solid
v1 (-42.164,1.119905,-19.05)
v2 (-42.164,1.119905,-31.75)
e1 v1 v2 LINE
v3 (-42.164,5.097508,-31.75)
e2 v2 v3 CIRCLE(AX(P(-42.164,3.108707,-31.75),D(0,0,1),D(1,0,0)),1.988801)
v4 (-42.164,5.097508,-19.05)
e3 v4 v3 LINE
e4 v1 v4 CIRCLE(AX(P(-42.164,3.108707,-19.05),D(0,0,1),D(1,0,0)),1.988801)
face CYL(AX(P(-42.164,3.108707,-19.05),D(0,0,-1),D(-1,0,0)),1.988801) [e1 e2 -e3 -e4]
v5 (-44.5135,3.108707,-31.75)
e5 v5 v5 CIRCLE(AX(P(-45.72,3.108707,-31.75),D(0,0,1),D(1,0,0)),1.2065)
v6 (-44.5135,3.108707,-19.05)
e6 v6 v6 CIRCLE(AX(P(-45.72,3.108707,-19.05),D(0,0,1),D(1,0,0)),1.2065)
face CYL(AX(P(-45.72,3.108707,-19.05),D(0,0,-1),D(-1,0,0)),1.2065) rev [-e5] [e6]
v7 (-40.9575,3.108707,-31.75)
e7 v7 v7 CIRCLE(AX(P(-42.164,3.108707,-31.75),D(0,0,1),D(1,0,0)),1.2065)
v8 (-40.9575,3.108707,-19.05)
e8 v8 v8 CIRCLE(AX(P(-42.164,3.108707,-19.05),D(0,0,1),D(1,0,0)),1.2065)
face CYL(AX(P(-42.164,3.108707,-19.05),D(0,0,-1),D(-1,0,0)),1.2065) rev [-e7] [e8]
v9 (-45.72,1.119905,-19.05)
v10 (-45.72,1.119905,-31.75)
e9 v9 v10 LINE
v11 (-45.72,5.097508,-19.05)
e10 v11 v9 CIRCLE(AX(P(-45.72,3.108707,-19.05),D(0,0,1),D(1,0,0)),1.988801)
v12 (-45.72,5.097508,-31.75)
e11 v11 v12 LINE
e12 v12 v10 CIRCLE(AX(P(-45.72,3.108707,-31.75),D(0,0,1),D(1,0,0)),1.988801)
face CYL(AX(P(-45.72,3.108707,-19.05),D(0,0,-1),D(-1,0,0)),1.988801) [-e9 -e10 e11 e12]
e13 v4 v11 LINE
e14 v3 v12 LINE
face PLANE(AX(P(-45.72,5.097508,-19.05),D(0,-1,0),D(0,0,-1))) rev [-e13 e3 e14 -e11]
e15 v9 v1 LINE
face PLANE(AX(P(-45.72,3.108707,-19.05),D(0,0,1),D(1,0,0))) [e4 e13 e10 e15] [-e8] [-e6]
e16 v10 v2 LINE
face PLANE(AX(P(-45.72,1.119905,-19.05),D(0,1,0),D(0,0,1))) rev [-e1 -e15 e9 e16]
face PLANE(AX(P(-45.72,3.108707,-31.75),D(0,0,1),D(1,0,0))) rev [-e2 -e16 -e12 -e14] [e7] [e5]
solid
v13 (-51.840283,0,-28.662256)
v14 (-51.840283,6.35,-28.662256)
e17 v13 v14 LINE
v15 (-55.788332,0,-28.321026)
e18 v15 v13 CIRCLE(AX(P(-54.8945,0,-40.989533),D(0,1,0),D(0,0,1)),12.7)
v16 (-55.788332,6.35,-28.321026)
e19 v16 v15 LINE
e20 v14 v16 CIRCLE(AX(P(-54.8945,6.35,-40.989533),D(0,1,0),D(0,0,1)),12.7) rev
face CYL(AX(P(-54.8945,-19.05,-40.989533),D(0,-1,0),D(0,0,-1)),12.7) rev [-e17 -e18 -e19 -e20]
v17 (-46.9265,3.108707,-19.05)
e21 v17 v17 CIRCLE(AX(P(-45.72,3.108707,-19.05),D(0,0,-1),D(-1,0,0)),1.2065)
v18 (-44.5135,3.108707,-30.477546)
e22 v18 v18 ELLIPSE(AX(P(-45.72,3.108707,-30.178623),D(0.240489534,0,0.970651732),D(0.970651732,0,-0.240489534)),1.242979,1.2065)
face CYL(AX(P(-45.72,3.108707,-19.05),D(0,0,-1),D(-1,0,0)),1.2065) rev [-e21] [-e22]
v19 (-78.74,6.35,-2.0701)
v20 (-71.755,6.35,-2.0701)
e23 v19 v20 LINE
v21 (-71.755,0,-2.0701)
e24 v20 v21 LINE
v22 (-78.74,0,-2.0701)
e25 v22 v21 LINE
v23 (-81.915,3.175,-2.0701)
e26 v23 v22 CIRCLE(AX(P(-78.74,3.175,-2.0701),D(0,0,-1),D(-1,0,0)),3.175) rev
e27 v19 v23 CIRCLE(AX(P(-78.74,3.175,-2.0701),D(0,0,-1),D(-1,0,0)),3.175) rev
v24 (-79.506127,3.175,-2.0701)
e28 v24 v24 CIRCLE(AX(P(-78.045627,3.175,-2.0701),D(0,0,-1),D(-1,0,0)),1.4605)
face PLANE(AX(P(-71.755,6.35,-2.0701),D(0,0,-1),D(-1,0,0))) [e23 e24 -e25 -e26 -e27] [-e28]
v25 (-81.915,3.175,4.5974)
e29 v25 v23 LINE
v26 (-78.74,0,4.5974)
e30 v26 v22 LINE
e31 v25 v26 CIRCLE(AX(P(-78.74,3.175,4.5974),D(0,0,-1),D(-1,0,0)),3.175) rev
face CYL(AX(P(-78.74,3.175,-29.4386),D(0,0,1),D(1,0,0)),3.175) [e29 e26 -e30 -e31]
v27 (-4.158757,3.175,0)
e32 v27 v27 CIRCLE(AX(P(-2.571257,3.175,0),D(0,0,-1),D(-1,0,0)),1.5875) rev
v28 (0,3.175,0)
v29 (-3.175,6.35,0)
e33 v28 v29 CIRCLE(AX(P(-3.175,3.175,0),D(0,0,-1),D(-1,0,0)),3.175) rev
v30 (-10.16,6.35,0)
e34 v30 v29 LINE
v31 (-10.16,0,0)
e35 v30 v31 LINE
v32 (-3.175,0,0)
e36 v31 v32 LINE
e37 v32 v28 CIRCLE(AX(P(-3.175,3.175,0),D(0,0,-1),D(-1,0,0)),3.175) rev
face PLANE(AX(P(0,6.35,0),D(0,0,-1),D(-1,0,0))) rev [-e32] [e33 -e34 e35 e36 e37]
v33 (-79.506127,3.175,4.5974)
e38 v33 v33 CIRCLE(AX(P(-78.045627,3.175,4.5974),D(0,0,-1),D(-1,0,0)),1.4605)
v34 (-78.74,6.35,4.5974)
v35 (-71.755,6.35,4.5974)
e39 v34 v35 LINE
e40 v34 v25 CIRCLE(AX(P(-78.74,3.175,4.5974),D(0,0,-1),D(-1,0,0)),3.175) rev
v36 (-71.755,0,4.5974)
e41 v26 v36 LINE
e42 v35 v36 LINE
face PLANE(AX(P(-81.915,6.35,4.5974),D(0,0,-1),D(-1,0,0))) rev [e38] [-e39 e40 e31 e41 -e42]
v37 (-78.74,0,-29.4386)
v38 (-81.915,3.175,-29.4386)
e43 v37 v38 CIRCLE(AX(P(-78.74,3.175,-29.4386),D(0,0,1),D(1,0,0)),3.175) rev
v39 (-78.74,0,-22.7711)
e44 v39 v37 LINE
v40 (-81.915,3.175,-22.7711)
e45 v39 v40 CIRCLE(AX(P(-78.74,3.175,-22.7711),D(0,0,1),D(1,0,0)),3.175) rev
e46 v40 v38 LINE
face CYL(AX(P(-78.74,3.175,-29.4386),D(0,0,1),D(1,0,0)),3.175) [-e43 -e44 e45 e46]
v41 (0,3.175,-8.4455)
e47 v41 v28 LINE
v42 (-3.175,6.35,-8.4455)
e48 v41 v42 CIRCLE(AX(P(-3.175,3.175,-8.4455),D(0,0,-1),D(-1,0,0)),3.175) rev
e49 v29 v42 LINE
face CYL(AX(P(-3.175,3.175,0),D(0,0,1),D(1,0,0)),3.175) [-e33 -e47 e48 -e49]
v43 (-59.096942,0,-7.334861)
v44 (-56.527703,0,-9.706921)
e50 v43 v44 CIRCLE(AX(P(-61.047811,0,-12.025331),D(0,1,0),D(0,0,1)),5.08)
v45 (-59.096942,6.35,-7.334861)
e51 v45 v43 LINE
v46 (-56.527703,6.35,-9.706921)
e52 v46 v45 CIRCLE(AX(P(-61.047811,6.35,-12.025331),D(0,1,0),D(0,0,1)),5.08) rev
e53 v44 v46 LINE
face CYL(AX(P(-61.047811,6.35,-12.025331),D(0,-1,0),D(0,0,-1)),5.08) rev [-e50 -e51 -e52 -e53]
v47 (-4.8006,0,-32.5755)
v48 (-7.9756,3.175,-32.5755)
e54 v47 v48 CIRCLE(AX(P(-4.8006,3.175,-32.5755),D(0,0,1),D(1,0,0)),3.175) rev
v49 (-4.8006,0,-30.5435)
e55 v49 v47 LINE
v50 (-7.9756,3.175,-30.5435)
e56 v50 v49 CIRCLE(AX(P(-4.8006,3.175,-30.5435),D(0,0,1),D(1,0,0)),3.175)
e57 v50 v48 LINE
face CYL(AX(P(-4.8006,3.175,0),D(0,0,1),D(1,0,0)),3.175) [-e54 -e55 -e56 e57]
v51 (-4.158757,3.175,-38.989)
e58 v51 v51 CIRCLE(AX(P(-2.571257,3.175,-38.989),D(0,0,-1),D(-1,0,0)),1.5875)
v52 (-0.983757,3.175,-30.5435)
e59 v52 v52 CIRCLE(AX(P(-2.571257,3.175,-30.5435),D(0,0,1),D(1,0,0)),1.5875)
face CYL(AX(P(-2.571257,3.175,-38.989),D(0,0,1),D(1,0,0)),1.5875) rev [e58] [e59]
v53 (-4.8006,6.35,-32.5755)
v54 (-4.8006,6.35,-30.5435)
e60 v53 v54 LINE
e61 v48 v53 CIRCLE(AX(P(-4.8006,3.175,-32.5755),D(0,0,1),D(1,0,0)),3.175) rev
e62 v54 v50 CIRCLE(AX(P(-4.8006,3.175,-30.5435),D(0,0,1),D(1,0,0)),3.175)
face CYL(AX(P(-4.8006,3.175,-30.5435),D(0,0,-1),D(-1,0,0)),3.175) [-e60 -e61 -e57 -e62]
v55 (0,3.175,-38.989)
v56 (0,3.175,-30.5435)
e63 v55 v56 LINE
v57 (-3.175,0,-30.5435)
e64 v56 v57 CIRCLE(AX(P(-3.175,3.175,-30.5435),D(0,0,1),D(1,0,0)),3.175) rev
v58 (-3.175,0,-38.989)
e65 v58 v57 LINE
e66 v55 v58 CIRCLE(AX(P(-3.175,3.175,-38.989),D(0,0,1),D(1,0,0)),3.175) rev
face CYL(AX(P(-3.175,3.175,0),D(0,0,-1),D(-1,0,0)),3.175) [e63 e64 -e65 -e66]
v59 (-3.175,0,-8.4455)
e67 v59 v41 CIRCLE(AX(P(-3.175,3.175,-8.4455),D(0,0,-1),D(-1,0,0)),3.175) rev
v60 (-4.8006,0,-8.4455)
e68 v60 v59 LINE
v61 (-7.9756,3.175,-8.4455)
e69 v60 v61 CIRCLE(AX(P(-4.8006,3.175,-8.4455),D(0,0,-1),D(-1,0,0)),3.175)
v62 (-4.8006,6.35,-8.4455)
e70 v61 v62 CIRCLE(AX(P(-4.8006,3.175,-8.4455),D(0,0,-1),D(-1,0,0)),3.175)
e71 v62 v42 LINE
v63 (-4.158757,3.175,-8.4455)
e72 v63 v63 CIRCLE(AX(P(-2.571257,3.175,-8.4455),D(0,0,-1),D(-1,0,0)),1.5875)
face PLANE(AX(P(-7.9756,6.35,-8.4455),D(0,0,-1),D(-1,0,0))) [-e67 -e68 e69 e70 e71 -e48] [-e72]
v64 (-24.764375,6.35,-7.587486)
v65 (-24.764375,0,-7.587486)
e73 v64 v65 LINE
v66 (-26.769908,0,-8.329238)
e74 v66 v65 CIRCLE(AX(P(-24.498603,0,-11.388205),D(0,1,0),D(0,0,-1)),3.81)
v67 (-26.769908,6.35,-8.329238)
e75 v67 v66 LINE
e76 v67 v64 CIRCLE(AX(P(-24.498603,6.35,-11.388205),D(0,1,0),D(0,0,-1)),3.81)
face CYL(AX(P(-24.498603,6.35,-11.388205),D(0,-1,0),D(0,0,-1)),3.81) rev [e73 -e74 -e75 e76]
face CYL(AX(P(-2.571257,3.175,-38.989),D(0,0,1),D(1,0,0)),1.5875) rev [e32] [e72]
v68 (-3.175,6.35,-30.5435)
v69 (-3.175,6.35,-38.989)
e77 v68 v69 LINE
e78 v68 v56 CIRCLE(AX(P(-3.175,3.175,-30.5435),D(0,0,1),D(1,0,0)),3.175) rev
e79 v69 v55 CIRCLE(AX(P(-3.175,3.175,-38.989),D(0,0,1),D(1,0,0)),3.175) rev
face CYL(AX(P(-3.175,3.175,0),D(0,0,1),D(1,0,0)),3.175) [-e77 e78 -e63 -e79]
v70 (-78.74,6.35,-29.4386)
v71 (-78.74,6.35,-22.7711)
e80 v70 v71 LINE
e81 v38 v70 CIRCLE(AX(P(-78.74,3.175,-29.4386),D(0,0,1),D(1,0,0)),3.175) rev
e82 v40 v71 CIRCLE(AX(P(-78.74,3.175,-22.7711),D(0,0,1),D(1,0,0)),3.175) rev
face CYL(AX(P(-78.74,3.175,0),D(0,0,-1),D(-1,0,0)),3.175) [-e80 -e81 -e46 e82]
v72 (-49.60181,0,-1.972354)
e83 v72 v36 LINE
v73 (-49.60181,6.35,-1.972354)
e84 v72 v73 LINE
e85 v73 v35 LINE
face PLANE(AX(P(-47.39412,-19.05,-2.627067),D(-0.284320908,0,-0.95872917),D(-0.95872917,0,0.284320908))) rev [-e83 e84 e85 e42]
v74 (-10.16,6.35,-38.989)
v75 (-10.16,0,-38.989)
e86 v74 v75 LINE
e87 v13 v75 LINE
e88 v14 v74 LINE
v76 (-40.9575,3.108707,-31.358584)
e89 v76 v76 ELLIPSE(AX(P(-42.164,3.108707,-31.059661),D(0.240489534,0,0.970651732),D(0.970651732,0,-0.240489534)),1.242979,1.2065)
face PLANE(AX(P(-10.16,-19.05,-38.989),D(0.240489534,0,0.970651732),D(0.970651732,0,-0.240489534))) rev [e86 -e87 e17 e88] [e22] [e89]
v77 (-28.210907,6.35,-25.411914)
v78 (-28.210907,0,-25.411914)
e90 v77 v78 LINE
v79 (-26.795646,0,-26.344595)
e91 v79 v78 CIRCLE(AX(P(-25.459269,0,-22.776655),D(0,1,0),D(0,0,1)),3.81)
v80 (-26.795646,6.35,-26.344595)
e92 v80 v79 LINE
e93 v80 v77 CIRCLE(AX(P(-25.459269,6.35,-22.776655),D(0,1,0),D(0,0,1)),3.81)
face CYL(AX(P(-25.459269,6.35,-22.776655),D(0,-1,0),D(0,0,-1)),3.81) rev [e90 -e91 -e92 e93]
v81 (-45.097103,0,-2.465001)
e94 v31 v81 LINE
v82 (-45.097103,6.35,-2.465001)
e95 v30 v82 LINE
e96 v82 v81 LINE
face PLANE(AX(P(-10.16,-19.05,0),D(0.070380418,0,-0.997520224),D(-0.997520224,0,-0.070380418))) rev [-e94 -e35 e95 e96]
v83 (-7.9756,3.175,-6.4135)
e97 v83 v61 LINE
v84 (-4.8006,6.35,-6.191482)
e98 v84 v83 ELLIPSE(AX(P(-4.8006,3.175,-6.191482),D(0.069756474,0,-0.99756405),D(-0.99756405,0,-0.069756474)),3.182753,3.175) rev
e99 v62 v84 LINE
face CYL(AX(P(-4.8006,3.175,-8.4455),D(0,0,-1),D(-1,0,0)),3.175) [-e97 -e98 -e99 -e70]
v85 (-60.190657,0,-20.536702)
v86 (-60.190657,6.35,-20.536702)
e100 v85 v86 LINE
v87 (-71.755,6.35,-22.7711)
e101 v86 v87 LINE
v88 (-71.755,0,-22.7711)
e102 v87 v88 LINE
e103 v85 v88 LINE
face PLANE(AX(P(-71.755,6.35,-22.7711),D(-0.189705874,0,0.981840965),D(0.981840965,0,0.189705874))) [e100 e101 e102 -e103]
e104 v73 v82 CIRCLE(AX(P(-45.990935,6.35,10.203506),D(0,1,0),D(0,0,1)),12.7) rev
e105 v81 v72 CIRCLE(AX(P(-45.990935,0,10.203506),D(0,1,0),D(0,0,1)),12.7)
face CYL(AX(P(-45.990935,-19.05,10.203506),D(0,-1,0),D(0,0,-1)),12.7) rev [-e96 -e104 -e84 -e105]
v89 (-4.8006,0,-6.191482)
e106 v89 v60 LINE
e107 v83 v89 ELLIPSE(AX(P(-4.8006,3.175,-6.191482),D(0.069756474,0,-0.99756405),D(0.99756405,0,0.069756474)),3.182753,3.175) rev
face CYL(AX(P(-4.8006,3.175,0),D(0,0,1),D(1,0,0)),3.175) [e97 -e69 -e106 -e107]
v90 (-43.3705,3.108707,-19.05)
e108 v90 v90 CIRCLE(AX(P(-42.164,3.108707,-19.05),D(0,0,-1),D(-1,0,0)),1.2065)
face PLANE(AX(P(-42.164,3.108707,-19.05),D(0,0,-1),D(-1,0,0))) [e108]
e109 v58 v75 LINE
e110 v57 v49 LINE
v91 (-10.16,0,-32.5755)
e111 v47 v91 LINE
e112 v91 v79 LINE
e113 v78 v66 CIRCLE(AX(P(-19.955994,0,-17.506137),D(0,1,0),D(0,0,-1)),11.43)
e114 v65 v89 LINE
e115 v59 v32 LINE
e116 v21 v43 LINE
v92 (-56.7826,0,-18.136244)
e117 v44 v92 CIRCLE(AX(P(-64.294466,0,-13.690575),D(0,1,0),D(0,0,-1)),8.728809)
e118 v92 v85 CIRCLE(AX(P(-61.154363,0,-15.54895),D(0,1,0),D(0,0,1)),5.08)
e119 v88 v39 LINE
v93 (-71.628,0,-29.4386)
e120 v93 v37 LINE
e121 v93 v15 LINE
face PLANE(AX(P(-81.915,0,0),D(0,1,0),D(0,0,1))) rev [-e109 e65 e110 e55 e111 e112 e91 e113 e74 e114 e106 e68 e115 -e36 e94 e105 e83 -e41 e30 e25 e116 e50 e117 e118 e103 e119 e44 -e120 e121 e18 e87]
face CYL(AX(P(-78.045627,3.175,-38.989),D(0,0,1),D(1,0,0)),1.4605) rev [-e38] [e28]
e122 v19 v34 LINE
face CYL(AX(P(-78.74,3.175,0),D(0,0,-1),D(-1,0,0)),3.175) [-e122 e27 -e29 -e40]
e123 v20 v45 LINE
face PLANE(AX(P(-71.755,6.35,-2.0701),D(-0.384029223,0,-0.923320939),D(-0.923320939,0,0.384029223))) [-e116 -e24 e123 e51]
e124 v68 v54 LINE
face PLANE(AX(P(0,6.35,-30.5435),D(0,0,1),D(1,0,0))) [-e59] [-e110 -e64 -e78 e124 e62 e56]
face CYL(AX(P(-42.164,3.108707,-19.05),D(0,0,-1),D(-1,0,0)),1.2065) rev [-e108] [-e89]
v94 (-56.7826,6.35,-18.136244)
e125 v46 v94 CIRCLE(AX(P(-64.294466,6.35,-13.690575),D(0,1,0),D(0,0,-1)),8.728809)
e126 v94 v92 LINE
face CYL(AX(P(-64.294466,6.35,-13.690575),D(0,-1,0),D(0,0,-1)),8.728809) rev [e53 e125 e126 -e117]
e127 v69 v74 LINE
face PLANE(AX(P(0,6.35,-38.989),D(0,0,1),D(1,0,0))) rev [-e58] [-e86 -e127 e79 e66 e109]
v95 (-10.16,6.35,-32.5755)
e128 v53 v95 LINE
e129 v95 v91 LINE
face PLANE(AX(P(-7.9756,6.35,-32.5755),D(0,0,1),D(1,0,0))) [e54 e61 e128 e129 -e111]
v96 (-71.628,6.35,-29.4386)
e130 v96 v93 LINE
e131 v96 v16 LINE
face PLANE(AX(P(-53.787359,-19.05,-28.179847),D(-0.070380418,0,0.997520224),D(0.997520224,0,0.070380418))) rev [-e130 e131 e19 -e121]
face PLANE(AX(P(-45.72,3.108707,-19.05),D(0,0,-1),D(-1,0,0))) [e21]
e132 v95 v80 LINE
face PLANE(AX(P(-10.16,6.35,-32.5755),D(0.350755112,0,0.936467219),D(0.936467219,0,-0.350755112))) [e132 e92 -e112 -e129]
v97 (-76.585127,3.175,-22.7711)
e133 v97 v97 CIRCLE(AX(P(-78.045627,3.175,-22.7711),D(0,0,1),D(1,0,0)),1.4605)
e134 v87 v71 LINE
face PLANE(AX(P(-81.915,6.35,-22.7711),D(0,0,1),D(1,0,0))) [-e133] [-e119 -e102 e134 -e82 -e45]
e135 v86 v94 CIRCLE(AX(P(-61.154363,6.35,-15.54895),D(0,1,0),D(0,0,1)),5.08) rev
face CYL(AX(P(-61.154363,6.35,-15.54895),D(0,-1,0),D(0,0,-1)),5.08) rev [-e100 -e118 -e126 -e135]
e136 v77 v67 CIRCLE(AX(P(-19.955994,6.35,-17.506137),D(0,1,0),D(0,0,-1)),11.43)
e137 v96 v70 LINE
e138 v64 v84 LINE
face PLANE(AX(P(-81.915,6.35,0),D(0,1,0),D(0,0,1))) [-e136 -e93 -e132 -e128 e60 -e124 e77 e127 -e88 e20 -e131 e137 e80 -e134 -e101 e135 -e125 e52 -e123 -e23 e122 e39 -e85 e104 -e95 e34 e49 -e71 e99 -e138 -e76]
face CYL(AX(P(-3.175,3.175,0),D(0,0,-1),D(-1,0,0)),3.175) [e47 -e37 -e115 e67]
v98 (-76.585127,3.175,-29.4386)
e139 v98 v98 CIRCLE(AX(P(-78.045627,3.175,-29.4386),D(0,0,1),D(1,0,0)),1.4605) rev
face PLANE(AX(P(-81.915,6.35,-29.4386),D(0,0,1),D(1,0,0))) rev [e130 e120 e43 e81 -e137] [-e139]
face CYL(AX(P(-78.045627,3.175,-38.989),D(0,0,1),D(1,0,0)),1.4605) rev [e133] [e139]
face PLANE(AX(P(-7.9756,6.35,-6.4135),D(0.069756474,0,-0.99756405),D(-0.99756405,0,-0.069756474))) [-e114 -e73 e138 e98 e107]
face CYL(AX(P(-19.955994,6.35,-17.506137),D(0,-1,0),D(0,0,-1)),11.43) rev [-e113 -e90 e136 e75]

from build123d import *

# Parameters (mm, degrees)
BOSS_EXTRUDE1_DEPTH     = 6.35
FILLET2_R               = 3.175
CUT_EXTRUDE2_DEPTH      = 91.397918676
CUT_EXTRUDE2_DEPTH_BACK = 91.397918676
SKETCH2_R               = 1.5875
SKETCH2_R_2             = 1.4605
CUT_EXTRUDE5_DEPTH      = 91.942464482
CUT_EXTRUDE7_DEPTH      = 25.4
FILLET3_R               = 3.175
SKETCH6_R               = 1.2065
BOSS_EXTRUDE2_DEPTH     = 12.7
SKETCH7_R               = 1.2065
CUT_EXTRUDE8_DEPTH      = 12.7
FILLET5_R               = 12.7
FILLET6_R               = 5.08


with BuildPart() as part:
    # Sketch1 → Boss-Extrude1 (new body)
    with BuildSketch(Plane(origin=(0, 0, 0), x_dir=(1, 0, 0), z_dir=(0, 1, 0))):
        Polygon((0, 0), (0, 38.989), (-10.16, 38.989), (-71.628, 29.4386), (-81.915, 29.4386), (-81.915, -4.5974), (-71.755, -4.5974), (-10.16, 0), align=None)
    extrude(amount=BOSS_EXTRUDE1_DEPTH)

    # Fillet2
    fillet2_edges = [part.edges().sort_by_distance(p)[0] for p in [
        (0, 0, -19.4945),
        (0, 6.35, -19.4945),
        (-81.915, 0, -12.4206),
        (-81.915, 6.35, -12.4206),
    ]]
    fillet(fillet2_edges, radius=FILLET2_R - 0.0001)  # a hair under: the kernel refuses the full size

    # Sketch2 → Cut-Extrude2 (cut, two sides: drawn at the far end of the back side and taken through both)
    with BuildSketch(Plane(origin=(-0.604981675, 0, 0), x_dir=(-1, 0, 0), z_dir=(0, 0, -1)).offset(-CUT_EXTRUDE2_DEPTH_BACK)):
        with Locations((1.966275702, 3.175)):
            Circle(SKETCH2_R)
        with Locations(Location((77.44064574, 3.175, 0), (0, 0, 180))):
            Circle(SKETCH2_R_2)
    extrude(amount=CUT_EXTRUDE2_DEPTH + CUT_EXTRUDE2_DEPTH_BACK, mode=Mode.SUBTRACT)

    # Sketch3 → Cut-Extrude5 (cut, through all)
    with BuildSketch(Plane(origin=(0, 0, 0), x_dir=(1, 0, 0), z_dir=(0, 1, 0))):
        with BuildLine():
            Line((-81.915, 22.7711), (-71.755, 22.7711))
            Line((-71.755, 22.7711), (-58.487579402, 20.207642468))
            ThreePointArc((-58.487579402, 20.207642468), (-55.580114305, 14.192748547), (-57.777398298, 7.883687982))
            Line((-57.777398298, 7.883687982), (-71.755, 2.0701))
            Line((-71.755, 2.0701), (-81.915, 2.0701))
            Line((-81.915, 2.0701), (-81.915, 22.7711))
        make_face()
        with BuildLine():
            Line((0, 30.5435), (0, 8.4455))
            Line((0, 8.4455), (-7.9756, 8.4455))
            Line((-7.9756, 8.4455), (-7.9756, 6.4135))
            Line((-7.9756, 6.4135), (-24.764375431, 7.587485542))
            ThreePointArc((-24.764375431, 7.587485542), (-25.820245836, 7.814780317), (-26.769908004, 8.32923828))
            ThreePointArc((-26.769908004, 8.32923828), (-31.345543526, 16.545378703), (-28.210906636, 25.41191441))
            ThreePointArc((-28.210906636, 25.41191441), (-27.55579932, 25.957953915), (-26.795645997, 26.34459543))
            Line((-26.795645997, 26.34459543), (-10.16, 32.5755))
            Line((-10.16, 32.5755), (-7.9756, 32.5755))
            Line((-7.9756, 32.5755), (-7.9756, 30.5435))
            Line((-7.9756, 30.5435), (0, 30.5435))
        make_face()
    extrude(amount=CUT_EXTRUDE5_DEPTH, mode=Mode.SUBTRACT)

    # Sketch5 → Cut-Extrude7 (cut)
    with BuildSketch(Plane(origin=(0, 6.35, 0), x_dir=(1, 0, 0), z_dir=(0, 1, 0))):
        Polygon((-10.16, 38.989), (-53.78735915, 28.179846815), (-71.628, 29.4386), align=None)
        Polygon((-10.16, 0), (-47.394119509, 2.627067431), (-71.755, -4.5974), align=None)
    extrude(amount=-CUT_EXTRUDE7_DEPTH, mode=Mode.SUBTRACT)

    # Fillet3
    fillet3_edges = [part.edges().sort_by_distance(p)[0] for p in [
        (-7.9756, 0, -7.4295),
        (-7.9756, 6.35, -7.4295),
        (-7.9756, 0, -31.5595),
        (-7.9756, 6.35, -31.5595),
    ]]
    fillet(fillet3_edges, radius=FILLET3_R - 0.0001)  # a hair under: the kernel refuses the full size

    # Sketch7 → Cut-Extrude8 (cut)
    with BuildSketch(Plane(origin=(0, 0, -31.75), x_dir=(-1, 0, 0), z_dir=(0, 0, -1))):
        with Locations(Location((45.72, 3.108706623, 0), (0, 0, 180))):
            Circle(SKETCH7_R)
        with Locations(Location((42.164, 3.108706623, 0), (0, 0, 180))):
            Circle(SKETCH7_R)
    extrude(amount=-CUT_EXTRUDE8_DEPTH, mode=Mode.SUBTRACT)

    # Fillet5
    fillet5_edges = [part.edges().sort_by_distance(p)[0] for p in [
        (-53.78735915, 3.175, -28.179846815),
        (-47.394119509, 3.175, -2.627067431),
    ]]
    fillet(fillet5_edges, radius=FILLET5_R)

    # Fillet6
    fillet6_edges = [part.edges().sort_by_distance(p)[0] for p in [
        (-57.777398298, 3.175, -7.883687982),
        (-58.487579402, 3.175, -20.207642468),
    ]]
    fillet(fillet6_edges, radius=FILLET6_R)


with BuildPart() as body_2:
    # Sketch6 → Boss-Extrude2 (new body)
    with BuildSketch(Plane.XY.offset(-31.75)):
        with BuildLine():
            Line((-45.72, 5.097507922), (-42.164, 5.097507922))
            ThreePointArc((-42.164, 5.097507922), (-40.175198702, 3.108706623), (-42.164, 1.119905325))
            Line((-42.164, 1.119905325), (-45.72, 1.119905325))
            ThreePointArc((-45.72, 1.119905325), (-47.708801298, 3.108706623), (-45.72, 5.097507922))
        make_face()
        with Locations((-45.72, 3.108706623)):
            Circle(SKETCH6_R, mode=Mode.SUBTRACT)
        with Locations((-42.164, 3.108706623)):
            Circle(SKETCH6_R, mode=Mode.SUBTRACT)
    extrude(amount=BOSS_EXTRUDE2_DEPTH)


solid = Compound([part.part, body_2.part])
